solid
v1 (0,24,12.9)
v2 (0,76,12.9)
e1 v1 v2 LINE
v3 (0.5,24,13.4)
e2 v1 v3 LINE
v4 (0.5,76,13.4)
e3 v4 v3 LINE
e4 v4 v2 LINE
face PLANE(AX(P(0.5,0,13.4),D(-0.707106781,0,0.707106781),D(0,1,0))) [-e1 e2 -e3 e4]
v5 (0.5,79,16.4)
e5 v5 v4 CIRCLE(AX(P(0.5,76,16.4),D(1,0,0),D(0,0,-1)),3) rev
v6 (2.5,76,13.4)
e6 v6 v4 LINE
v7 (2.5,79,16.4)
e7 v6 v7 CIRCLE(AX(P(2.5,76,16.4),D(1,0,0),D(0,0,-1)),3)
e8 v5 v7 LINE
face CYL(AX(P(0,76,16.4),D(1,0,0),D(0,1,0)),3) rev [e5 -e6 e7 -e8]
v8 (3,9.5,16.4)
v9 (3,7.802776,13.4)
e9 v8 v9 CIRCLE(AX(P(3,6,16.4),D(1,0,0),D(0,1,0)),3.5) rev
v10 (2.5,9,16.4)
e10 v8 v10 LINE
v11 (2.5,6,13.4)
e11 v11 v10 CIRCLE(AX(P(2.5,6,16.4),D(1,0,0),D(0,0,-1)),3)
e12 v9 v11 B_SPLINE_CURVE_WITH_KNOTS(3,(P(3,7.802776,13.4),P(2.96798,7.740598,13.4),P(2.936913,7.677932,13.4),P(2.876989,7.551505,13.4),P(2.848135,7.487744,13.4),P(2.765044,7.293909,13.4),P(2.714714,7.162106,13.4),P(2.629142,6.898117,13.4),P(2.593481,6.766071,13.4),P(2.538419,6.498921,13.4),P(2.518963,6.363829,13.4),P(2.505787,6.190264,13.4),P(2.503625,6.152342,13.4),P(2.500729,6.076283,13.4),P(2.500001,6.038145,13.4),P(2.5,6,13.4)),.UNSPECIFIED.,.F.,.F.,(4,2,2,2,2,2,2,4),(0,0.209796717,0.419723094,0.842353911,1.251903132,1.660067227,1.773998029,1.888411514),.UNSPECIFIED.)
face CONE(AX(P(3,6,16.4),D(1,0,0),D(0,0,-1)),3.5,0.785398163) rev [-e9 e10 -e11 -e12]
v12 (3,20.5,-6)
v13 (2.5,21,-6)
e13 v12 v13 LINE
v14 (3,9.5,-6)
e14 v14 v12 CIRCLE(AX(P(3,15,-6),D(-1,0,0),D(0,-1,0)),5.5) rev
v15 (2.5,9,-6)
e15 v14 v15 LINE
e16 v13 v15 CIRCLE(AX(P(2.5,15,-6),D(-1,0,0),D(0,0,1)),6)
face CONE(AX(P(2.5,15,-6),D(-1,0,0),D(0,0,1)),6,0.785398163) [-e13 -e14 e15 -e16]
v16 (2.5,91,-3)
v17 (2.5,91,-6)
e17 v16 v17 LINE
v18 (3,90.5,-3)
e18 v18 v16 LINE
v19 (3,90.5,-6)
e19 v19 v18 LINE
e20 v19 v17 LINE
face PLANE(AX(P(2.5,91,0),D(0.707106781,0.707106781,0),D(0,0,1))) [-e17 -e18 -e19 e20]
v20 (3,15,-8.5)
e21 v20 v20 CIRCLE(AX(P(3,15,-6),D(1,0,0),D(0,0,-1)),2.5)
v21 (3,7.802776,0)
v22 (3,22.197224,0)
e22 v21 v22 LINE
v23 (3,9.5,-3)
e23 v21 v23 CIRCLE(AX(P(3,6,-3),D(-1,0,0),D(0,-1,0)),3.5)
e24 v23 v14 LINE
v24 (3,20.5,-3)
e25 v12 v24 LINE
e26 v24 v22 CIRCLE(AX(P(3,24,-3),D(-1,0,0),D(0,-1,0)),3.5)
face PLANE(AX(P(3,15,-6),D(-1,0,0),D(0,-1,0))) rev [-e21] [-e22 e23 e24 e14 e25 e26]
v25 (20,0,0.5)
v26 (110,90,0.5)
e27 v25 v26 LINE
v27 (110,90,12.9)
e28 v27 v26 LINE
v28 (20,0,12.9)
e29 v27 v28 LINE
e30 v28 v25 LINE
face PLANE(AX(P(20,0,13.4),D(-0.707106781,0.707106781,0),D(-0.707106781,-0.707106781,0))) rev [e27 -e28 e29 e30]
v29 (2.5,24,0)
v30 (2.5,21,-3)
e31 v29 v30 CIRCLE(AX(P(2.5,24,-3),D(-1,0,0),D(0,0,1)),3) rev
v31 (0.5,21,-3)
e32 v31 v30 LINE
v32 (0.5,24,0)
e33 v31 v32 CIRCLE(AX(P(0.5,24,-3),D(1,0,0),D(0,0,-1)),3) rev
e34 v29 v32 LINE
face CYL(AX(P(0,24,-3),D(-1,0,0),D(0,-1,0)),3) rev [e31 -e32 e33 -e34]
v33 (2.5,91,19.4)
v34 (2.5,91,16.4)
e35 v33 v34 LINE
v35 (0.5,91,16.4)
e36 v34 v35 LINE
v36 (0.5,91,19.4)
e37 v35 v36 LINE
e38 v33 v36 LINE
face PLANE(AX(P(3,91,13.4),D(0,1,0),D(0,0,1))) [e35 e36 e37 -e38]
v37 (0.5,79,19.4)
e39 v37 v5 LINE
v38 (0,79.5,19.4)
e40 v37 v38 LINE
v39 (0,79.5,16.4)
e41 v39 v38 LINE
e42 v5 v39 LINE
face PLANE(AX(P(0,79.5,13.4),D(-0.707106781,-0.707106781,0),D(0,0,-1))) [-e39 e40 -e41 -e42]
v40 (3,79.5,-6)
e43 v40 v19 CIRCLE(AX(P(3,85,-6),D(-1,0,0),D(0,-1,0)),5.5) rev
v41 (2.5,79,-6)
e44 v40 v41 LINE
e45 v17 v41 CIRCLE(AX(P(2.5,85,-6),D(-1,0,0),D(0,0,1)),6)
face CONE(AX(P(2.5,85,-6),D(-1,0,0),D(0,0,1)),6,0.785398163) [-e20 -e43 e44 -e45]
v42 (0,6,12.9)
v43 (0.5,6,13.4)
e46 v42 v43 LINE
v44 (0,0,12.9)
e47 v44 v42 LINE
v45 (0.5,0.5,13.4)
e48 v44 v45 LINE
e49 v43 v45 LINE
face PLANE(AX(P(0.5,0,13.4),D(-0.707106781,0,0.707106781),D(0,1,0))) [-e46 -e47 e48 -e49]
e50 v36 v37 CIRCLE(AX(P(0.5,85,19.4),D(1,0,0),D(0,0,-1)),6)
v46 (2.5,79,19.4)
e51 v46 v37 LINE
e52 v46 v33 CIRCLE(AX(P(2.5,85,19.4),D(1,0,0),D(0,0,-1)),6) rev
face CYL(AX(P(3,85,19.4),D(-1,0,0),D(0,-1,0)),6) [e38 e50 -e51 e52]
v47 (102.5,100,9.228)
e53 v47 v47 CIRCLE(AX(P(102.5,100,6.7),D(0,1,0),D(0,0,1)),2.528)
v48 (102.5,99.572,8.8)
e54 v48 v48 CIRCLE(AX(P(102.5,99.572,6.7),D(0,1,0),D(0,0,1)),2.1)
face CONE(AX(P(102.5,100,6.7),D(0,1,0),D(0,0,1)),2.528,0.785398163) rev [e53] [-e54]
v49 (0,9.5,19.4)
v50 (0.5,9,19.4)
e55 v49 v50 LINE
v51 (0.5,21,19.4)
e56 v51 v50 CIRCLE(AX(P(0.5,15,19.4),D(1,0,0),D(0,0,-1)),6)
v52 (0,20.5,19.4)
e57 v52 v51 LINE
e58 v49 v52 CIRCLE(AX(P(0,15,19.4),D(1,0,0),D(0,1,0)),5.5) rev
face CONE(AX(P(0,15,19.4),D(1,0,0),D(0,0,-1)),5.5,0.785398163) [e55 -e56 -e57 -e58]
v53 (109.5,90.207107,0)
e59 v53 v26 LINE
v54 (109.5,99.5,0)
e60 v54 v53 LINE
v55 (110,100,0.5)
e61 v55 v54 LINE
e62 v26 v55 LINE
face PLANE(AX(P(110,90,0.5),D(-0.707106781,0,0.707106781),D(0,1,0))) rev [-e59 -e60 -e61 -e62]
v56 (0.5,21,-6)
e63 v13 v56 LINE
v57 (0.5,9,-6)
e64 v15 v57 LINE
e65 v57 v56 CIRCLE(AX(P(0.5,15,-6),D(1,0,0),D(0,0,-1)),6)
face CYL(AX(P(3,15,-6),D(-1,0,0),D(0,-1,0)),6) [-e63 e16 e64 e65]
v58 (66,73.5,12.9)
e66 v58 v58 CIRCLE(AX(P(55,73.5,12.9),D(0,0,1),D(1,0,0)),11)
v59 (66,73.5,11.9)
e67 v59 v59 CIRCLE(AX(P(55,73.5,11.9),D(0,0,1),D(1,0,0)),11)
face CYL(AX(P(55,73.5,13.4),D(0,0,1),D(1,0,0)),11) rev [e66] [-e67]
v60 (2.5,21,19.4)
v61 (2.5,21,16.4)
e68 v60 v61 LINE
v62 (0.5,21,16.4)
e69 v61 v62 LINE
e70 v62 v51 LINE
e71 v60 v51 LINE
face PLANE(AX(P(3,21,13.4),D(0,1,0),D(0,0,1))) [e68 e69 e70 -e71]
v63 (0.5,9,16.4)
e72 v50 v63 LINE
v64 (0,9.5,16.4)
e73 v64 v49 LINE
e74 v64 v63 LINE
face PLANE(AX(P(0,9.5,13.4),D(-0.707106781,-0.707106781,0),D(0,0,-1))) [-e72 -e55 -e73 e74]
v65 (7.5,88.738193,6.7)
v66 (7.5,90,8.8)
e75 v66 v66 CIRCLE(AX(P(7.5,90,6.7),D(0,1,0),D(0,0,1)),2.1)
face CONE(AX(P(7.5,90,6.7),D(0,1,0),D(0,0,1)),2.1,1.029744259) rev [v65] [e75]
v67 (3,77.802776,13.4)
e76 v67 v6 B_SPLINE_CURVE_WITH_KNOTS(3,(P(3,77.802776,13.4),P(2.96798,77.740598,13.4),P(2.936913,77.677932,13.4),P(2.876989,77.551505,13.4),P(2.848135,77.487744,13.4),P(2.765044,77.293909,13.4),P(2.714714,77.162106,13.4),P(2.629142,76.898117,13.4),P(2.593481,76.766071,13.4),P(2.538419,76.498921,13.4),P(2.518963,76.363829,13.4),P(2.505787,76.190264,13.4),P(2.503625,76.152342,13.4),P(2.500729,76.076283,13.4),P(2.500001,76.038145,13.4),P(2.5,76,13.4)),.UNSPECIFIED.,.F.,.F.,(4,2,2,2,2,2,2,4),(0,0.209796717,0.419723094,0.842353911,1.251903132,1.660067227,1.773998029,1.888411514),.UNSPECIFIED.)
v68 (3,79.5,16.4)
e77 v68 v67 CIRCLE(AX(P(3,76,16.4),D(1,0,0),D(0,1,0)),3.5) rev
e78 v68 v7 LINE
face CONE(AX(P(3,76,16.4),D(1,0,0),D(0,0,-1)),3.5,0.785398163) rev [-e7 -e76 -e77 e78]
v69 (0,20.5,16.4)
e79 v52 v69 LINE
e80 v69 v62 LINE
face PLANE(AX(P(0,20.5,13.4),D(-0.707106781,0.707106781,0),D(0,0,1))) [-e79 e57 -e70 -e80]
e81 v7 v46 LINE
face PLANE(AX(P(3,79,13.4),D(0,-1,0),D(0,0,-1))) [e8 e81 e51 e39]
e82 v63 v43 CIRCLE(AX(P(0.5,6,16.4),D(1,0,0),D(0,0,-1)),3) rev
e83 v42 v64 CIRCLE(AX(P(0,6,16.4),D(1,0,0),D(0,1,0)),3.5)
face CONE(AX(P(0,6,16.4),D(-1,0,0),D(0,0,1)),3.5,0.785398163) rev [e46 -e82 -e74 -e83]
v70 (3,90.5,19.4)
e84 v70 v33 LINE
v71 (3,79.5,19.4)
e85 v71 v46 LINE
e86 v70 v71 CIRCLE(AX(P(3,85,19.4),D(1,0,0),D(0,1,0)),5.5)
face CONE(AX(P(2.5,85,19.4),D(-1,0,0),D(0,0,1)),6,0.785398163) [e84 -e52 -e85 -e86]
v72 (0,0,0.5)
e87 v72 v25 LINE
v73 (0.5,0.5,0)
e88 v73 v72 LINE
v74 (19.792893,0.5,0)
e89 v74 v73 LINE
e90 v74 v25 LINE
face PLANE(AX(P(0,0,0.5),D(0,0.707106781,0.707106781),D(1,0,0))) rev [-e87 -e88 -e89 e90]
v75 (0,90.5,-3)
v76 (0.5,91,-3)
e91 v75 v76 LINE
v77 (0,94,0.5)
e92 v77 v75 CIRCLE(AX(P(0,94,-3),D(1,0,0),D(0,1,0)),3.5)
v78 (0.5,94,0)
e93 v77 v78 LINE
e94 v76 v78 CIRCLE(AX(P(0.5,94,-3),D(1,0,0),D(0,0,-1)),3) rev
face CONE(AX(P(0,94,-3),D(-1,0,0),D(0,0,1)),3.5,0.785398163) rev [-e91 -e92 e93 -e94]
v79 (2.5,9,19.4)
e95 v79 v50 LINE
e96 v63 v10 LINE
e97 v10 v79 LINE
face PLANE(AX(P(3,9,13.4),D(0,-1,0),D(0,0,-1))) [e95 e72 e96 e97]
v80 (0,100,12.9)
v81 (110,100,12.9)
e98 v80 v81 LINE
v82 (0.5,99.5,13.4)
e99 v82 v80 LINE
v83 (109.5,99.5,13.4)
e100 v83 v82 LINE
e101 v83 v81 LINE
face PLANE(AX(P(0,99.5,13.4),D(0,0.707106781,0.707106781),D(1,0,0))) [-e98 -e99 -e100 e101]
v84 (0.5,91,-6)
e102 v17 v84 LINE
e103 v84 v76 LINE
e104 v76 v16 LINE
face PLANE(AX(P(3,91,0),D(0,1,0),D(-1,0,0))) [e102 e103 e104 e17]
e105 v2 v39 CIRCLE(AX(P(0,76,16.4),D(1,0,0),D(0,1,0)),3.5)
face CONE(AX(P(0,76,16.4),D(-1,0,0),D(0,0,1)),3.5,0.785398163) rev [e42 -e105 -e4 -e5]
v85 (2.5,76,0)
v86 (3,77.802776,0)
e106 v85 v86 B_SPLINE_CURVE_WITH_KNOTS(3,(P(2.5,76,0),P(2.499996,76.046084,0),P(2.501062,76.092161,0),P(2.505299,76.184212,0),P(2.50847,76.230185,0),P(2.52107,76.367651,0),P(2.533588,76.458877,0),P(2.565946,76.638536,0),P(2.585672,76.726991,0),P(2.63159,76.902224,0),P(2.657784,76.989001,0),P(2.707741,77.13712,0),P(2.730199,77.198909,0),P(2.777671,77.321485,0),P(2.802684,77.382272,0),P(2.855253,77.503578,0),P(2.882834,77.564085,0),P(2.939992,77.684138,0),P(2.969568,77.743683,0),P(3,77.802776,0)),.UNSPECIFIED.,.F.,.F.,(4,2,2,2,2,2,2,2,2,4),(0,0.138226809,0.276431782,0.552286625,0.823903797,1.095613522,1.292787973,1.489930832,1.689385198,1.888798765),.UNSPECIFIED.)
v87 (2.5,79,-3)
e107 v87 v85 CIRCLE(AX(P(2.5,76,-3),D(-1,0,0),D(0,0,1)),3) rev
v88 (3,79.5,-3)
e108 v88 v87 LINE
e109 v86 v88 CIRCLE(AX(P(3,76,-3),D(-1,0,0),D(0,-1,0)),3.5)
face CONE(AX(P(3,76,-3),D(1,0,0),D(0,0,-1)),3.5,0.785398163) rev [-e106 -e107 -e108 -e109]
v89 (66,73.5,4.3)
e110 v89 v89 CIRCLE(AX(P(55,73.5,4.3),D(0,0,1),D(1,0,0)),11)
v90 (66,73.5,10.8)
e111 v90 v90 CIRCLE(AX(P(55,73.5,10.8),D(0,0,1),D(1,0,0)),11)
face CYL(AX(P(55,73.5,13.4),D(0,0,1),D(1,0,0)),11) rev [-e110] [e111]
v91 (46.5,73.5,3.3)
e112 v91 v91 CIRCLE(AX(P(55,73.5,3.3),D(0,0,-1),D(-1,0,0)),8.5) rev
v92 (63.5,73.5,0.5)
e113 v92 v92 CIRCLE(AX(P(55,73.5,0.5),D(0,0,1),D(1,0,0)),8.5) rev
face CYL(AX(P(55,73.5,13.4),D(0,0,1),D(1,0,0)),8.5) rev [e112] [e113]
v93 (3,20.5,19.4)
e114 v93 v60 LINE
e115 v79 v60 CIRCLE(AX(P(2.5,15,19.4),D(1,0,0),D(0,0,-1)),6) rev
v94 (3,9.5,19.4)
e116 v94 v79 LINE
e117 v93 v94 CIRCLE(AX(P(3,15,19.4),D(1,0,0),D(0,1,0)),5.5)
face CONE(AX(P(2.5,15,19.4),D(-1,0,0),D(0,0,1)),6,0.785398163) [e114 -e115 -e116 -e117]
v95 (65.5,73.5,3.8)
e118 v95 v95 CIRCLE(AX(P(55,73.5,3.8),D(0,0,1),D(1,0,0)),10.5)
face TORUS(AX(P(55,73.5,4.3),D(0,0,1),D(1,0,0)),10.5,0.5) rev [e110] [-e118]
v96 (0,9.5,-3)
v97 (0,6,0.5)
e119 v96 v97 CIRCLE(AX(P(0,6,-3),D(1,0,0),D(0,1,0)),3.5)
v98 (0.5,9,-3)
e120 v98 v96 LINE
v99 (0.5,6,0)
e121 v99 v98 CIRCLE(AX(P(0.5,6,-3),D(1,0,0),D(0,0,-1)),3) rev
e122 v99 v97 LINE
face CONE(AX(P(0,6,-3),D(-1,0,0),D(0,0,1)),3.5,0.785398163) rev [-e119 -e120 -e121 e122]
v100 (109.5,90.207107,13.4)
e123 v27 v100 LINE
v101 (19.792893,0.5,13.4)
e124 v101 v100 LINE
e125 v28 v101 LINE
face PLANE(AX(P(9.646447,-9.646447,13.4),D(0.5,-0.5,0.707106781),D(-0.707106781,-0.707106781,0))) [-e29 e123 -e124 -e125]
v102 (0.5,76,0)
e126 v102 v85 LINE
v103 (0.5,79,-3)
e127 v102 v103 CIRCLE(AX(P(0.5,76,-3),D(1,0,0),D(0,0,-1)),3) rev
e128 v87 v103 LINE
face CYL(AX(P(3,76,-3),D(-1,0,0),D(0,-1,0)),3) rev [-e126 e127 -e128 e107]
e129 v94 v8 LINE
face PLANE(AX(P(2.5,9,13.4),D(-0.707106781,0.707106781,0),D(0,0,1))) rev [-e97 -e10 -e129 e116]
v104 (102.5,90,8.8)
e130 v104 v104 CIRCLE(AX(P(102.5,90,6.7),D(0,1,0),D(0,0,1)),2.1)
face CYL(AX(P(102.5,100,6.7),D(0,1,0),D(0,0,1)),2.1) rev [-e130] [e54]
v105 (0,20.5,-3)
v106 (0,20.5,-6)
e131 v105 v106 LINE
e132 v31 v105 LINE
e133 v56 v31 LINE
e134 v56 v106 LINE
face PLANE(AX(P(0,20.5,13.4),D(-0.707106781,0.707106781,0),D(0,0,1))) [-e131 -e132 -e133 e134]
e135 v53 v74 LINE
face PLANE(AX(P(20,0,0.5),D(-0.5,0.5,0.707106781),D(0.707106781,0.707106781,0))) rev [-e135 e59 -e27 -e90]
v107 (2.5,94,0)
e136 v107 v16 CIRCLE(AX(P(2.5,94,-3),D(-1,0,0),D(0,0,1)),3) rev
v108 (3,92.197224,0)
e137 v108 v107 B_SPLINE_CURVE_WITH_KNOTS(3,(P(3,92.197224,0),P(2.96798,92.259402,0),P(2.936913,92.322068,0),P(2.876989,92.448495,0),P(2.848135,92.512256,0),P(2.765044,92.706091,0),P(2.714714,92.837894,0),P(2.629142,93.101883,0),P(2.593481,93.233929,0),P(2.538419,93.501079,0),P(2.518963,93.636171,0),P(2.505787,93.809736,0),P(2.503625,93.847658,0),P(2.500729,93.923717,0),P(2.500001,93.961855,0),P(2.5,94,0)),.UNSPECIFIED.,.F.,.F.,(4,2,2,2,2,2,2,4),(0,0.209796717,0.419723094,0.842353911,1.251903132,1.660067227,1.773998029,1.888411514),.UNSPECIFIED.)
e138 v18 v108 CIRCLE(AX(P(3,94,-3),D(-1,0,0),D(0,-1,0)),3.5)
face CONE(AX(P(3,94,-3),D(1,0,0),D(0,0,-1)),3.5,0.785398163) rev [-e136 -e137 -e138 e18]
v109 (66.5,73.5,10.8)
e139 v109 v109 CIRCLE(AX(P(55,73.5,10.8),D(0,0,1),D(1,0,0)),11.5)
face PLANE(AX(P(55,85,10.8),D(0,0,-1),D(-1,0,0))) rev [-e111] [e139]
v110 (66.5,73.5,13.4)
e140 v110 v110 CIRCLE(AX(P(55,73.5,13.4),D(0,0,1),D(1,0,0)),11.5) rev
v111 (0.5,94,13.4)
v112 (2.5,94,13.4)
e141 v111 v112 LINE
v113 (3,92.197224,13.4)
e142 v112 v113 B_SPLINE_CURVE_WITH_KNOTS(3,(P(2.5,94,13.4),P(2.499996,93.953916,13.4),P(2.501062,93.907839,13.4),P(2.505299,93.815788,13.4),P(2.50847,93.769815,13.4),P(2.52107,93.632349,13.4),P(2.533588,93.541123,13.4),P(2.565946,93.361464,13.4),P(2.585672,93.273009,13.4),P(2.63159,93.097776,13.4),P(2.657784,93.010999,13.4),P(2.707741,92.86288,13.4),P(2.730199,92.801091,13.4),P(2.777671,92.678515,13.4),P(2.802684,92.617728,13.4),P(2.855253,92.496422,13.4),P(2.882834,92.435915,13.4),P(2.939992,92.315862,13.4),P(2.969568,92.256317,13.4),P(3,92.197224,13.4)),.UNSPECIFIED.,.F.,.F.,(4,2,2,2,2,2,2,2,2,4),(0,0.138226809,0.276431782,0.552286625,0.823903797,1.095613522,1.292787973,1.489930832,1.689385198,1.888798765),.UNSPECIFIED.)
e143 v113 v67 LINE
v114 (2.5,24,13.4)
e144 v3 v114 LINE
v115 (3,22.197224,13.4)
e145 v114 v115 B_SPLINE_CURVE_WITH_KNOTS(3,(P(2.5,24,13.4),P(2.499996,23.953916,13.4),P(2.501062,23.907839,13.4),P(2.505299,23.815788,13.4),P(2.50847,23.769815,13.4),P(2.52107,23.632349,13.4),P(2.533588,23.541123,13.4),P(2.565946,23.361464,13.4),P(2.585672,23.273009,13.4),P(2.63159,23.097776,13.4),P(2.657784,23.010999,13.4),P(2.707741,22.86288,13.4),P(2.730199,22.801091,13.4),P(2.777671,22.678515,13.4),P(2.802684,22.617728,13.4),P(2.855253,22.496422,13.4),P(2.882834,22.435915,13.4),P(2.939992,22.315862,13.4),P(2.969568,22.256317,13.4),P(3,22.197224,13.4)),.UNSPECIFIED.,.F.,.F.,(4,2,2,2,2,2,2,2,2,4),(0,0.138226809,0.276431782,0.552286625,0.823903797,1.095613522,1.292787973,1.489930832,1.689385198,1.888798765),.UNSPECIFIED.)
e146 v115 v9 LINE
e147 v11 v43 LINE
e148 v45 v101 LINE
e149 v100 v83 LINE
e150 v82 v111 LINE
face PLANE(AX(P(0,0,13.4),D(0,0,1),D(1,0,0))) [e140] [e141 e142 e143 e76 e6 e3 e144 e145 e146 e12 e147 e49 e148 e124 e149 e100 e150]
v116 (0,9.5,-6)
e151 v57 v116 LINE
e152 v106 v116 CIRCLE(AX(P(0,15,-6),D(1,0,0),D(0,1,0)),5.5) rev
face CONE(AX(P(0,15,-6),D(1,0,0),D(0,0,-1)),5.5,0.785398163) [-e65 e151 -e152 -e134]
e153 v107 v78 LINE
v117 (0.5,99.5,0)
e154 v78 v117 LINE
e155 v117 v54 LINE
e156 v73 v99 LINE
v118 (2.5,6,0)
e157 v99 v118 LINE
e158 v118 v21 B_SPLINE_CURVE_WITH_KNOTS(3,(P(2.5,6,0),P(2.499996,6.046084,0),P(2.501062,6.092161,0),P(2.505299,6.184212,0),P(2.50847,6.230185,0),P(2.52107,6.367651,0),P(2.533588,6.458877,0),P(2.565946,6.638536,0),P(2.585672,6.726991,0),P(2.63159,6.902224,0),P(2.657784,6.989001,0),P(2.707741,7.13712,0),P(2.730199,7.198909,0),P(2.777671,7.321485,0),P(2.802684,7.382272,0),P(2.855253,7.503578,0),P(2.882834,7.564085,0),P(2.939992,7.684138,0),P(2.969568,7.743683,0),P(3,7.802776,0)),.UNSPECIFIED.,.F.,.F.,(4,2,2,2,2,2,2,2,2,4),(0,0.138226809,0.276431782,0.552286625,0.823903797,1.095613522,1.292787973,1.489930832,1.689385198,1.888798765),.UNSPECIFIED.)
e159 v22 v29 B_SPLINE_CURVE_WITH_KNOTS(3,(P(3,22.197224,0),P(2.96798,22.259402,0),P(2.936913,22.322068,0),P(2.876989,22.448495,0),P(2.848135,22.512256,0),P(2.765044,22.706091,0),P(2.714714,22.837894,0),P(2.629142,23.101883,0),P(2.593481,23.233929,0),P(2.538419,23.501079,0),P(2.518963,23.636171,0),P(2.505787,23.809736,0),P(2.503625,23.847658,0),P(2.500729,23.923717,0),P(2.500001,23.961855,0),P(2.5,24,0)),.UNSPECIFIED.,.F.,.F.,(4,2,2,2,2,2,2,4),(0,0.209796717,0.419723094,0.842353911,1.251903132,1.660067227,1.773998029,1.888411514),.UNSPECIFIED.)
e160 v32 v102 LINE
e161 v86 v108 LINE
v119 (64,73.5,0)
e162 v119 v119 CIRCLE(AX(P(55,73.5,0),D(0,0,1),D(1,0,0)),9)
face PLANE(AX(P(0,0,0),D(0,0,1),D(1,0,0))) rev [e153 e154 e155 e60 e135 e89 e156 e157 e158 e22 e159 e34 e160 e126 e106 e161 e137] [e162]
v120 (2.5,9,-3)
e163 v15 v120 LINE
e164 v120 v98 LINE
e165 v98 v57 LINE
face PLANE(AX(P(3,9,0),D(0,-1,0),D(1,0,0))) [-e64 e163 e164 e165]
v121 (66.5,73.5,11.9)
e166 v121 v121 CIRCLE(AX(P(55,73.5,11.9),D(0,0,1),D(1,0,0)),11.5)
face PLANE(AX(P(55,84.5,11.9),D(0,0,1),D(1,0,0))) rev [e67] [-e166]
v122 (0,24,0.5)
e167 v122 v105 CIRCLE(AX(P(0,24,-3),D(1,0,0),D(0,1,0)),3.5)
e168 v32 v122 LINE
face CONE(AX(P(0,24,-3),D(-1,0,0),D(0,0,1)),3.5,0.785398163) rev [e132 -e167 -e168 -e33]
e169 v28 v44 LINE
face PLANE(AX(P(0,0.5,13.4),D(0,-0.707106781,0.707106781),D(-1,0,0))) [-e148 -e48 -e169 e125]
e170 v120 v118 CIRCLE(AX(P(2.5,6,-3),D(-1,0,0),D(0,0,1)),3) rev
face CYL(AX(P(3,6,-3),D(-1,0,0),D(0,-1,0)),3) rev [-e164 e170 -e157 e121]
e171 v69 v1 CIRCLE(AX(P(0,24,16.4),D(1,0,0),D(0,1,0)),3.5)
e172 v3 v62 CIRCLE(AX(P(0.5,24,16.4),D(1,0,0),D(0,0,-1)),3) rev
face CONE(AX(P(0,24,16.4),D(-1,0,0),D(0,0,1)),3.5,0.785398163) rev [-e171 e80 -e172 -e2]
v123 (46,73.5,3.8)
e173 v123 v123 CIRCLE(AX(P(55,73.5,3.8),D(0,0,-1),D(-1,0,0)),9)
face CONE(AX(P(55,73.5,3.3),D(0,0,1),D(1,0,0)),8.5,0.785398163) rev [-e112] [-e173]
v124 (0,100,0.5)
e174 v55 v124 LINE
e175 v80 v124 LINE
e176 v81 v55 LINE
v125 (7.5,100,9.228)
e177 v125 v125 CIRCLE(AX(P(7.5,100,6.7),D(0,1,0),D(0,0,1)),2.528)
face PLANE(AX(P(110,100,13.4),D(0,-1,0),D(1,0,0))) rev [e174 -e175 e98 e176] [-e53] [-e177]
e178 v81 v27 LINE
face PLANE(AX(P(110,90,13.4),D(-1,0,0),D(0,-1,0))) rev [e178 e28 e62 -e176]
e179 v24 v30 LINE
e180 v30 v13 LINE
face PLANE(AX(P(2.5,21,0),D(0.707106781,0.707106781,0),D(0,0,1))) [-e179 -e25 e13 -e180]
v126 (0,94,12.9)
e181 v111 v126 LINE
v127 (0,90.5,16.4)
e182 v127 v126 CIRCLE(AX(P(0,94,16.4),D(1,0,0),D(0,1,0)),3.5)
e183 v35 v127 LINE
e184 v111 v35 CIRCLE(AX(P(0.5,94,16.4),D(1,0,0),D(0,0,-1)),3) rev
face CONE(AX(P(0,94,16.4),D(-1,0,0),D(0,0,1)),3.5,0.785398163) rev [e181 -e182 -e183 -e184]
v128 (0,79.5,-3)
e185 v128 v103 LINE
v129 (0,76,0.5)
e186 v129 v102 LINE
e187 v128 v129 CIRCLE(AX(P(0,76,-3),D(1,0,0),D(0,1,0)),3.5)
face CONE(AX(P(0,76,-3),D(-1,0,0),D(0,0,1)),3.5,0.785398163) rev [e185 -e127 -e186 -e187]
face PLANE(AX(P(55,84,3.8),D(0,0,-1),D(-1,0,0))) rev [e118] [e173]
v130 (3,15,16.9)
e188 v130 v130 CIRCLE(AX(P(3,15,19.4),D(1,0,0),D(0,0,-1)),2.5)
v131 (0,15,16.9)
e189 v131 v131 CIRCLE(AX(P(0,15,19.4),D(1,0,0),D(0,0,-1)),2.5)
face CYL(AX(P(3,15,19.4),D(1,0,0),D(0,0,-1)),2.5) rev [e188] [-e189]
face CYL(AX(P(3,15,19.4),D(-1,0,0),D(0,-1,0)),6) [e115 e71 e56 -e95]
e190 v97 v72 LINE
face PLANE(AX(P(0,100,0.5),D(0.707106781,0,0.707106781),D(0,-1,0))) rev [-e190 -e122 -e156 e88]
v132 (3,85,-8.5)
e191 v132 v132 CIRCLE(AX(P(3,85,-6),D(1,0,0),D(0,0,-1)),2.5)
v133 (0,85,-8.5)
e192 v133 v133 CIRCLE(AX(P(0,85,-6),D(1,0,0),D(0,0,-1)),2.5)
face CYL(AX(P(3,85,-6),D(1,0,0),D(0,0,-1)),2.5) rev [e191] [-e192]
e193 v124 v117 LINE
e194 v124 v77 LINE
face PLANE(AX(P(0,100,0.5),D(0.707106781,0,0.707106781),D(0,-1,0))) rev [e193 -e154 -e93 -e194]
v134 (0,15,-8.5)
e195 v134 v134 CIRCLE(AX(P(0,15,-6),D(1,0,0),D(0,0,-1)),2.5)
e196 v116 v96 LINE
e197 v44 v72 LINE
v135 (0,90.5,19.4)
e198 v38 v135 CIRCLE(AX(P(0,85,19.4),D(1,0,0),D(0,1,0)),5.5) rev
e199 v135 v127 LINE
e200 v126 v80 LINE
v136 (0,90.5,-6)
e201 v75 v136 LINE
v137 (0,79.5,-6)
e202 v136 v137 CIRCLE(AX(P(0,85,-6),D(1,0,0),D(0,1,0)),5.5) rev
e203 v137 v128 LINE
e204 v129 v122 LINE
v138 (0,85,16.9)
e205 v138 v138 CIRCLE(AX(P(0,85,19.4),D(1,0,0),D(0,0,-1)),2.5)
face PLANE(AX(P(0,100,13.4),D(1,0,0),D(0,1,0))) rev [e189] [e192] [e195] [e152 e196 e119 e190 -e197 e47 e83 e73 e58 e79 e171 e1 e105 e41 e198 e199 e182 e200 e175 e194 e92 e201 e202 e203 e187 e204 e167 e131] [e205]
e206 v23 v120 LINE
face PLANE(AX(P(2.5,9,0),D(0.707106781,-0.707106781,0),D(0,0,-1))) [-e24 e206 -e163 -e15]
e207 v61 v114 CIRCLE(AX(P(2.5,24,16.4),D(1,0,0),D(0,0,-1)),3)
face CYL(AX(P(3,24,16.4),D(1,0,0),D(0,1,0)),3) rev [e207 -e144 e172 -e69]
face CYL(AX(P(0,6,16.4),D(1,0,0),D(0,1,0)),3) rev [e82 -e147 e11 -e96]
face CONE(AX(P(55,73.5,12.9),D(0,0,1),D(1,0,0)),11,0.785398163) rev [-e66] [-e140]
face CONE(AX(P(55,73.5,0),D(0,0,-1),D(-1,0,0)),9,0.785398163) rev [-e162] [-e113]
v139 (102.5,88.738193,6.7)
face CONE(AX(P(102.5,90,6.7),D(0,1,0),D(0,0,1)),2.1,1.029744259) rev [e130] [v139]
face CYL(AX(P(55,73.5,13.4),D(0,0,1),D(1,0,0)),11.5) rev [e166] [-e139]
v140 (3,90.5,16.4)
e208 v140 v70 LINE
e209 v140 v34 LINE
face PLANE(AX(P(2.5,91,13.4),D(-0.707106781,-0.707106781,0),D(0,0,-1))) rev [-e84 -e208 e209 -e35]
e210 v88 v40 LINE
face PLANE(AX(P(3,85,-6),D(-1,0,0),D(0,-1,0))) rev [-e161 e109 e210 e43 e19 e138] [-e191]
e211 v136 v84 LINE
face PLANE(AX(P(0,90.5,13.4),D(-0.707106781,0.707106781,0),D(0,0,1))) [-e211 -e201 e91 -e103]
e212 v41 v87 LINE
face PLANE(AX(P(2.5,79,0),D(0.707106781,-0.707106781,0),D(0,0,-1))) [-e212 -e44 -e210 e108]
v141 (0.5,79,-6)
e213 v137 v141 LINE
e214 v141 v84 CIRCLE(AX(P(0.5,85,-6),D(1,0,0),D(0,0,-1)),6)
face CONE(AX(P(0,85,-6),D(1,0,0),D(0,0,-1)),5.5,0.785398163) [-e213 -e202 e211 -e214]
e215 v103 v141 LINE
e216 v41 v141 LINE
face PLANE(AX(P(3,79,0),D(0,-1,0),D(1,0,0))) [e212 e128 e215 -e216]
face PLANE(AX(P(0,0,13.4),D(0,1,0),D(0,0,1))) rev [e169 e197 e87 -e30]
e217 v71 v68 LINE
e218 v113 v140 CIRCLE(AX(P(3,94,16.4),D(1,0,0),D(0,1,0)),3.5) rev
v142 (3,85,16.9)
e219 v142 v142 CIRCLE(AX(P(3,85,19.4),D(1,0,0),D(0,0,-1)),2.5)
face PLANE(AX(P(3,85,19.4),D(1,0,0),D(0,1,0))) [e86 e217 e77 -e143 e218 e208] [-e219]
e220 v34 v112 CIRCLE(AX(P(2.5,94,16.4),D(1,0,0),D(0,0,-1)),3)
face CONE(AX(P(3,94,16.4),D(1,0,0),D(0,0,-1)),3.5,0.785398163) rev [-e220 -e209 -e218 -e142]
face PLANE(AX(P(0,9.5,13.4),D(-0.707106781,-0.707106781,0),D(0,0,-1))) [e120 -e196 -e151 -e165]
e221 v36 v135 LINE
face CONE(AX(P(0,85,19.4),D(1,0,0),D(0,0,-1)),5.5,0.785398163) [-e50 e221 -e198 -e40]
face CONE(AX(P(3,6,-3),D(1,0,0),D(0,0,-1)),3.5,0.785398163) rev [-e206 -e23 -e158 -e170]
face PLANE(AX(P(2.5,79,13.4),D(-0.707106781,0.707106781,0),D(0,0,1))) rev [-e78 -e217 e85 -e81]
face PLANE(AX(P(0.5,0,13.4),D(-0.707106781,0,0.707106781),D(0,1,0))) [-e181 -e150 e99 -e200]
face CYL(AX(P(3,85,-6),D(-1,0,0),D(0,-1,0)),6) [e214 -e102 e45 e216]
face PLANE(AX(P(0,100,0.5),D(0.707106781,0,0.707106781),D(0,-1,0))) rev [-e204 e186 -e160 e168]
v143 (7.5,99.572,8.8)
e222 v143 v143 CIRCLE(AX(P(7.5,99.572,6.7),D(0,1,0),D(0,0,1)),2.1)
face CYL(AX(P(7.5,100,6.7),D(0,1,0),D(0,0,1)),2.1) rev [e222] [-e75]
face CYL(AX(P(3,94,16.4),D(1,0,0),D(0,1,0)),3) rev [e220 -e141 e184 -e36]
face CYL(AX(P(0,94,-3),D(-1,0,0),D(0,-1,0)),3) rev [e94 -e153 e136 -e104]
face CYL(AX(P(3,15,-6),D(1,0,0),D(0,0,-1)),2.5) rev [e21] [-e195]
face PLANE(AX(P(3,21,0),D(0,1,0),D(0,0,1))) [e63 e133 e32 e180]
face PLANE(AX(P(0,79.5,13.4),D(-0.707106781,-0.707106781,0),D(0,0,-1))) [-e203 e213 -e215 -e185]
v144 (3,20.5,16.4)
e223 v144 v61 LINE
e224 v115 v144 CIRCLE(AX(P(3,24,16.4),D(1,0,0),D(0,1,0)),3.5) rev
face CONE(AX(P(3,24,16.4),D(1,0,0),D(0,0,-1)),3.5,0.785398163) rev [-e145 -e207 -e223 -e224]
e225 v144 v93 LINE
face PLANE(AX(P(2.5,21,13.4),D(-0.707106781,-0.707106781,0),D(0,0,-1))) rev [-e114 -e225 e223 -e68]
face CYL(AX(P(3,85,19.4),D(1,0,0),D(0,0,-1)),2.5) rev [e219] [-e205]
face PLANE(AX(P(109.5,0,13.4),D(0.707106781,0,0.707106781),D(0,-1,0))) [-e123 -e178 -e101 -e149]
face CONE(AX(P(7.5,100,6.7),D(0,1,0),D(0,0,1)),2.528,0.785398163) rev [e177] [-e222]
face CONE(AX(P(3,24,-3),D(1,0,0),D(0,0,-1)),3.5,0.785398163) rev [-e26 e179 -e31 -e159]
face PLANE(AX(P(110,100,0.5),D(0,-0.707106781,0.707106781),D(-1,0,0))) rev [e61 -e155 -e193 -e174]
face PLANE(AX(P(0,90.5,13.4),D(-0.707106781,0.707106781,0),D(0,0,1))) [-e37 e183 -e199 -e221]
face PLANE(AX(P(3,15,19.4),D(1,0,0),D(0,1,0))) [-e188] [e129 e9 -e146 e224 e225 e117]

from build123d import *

# Parameters (mm, degrees)
BOSS_EXTRUDE1_DEPTH         = 13.4
BOSS_EXTRUDE2_DEPTH         = 3
FILLET1_R                   = 3
CHAMFER1_SIZE               = 0.5
F_5_0MM_DOWEL_HOLE1_D       = 5
FASE1_SIZE                  = 0.5
M5_TAPPED_HOLE1_D           = 4.2
M5_TAPPED_HOLE1_DEPTH       = 10
M5_TAPPED_HOLE1_CSINK_D     = 5.056
M5_TAPPED_HOLE1_CSINK_ANGLE = 90
M5_TAPPED_HOLE1_TIP         = 1.2618073


with BuildPart() as part:
    # Sketch1 → Boss-Extrude1 (new body)
    with BuildSketch(Plane.XY):
        Polygon((0, 0), (20, 0), (110, 90), (110, 100), (0, 100), align=None)
    extrude(amount=BOSS_EXTRUDE1_DEPTH)

    # Sketch3 → Boss-Extrude2 (add)
    with BuildSketch(Plane.ZY):
        with BuildLine():
            Line((13.4, 91), (19.4, 91))
            ThreePointArc((19.4, 91), (25.4, 85), (19.4, 79))
            Line((19.4, 79), (13.4, 79))
            Line((13.4, 79), (13.4, 91))
        make_face()
        with BuildLine():
            Line((13.4, 21), (19.4, 21))
            ThreePointArc((19.4, 21), (25.4, 15), (19.4, 9))
            Line((19.4, 9), (13.4, 9))
            Line((13.4, 9), (13.4, 21))
        make_face()
        with BuildLine():
            Line((0, 91), (-6, 91))
            ThreePointArc((-6, 91), (-12, 85), (-6, 79))
            Line((-6, 79), (0, 79))
            Line((0, 79), (0, 91))
        make_face()
        with BuildLine():
            Line((0, 21), (-6, 21))
            ThreePointArc((-6, 21), (-12, 15), (-6, 9))
            Line((-6, 9), (0, 9))
            Line((0, 9), (0, 21))
        make_face()
    extrude(amount=-BOSS_EXTRUDE2_DEPTH)

    # Fillet1
    fillet1_edges = [part.edges().sort_by_distance(p)[0] for p in [
        (1.5, 9, 13.4),
        (1.5, 21, 13.4),
        (1.5, 91, 0),
        (1.5, 79, 0),
        (1.5, 21, 0),
        (1.5, 9, 0),
        (1.5, 79, 13.4),
        (1.5, 91, 13.4),
    ]]
    fillet(fillet1_edges, radius=FILLET1_R)

    # Chamfer1
    # the kernel refuses this chamfer: 0.5 mm, written as the material it takes off along each edge
    with BuildSketch(Plane(origin=(19.09077276, -0.90922724, 13.4), x_dir=(0.01944252080601503, -0.019442520806014957, -0.9996219169112968), z_dir=(0.7071067811865462, 0.7071067811865489, 0))) as chamfer1_piece_1:
        Polygon((CHAMFER1_SIZE * 0.999621916911, CHAMFER1_SIZE * 0.0274958766106), (-CHAMFER1_SIZE * 0.0274958766106, CHAMFER1_SIZE * 0.999621916911), (0, 0), align=None)
    extrude(amount=129.850903602, mode=Mode.SUBTRACT)
    with BuildSketch(Plane(origin=(110, 88.714158506, 13.4), x_dir=(0.0274958766105822, 0, -0.999621916911297), z_dir=(0, 1, 0))) as chamfer1_piece_2:
        Polygon((CHAMFER1_SIZE * 0.999621916911, CHAMFER1_SIZE * 0.0274958766106), (-CHAMFER1_SIZE * 0.0274958766106, CHAMFER1_SIZE * 0.999621916911), (0, 0), align=None)
    extrude(amount=12.571682988, mode=Mode.SUBTRACT)
    with BuildSketch(Plane(origin=(111.285841494, 100, 13.4), x_dir=(0, 0.0274958766105822, -0.999621916911297), z_dir=(-1, 0, 0)), Plane(origin=(111.285841494, 100, 0), x_dir=(0, -0.9996219169112968, -0.027495876610586483), z_dir=(-1, 0, 0))) as chamfer1_piece_3:
        Polygon((CHAMFER1_SIZE * 0.999621916911, CHAMFER1_SIZE * 0.0274958766106), (-CHAMFER1_SIZE * 0.0274958766106, CHAMFER1_SIZE * 0.999621916911), (0, 0), align=None)
    extrude(amount=112.571682988, mode=Mode.SUBTRACT)
    with BuildSketch(Plane(origin=(3, 21, 16.4), x_dir=(0.02749587661058555, -0.9996219169112968, 1.1837901526131803e-15), z_dir=(0, 0, 1)), Plane(origin=(0, 79, -6), x_dir=(-0.027495876610586535, 0.9996219169112968, 0), z_dir=(0, 0, 1)), Plane(origin=(0, 9, -6), x_dir=(-0.027495876610586584, 0.9996219169112968, 0), z_dir=(0, 0, 1)), Plane(origin=(3, 91, 16.4), x_dir=(0.02749587661058574, -0.9996219169112968, 2.3675803052263605e-15), z_dir=(0, 0, 1)), Plane(origin=(3, 79, 19.4), x_dir=(0.027495876610586605, 0.9996219169112968, -2.3675803052263605e-15), z_dir=(0, 0, -1)), Plane(origin=(3, 9, 19.4), x_dir=(0.02749587661058651, 0.9996219169112968, -1.1837901526131803e-15), z_dir=(0, 0, -1)), Plane(origin=(0, 21, -3), x_dir=(-0.027495876610586823, -0.9996219169112968, 0), z_dir=(0, 0, -1)), Plane(origin=(0, 91, -3), x_dir=(-0.027495876610586435, -0.9996219169112968, 0), z_dir=(0, 0, -1))) as chamfer1_piece_4:
        Polygon((CHAMFER1_SIZE * 0.999621916911, -CHAMFER1_SIZE * 0.0274958766106), (-CHAMFER1_SIZE * 0.0274958766106, -CHAMFER1_SIZE * 0.999621916911), (0, 0), align=None)
    extrude(amount=3, mode=Mode.SUBTRACT)
    with BuildSketch(Plane(origin=(3, 15, 19.4), x_dir=(0, 1, 0), z_dir=(0, 0, -1))) as chamfer1_piece_5:
        Polygon((6 - CHAMFER1_SIZE, 0), (6, -CHAMFER1_SIZE), (6, 0), align=None)
    revolve(axis=Axis((3, 15, 19.4), (1, 0, 0)), revolution_arc=180, mode=Mode.SUBTRACT)
    with BuildSketch(Plane(origin=(0, 15, 19.4), x_dir=(0, 1, 0), z_dir=(0, 0, -1))) as chamfer1_piece_6:
        Polygon((6 - CHAMFER1_SIZE, 0), (6, CHAMFER1_SIZE), (6, 0), align=None)
    revolve(axis=Axis((0, 15, 19.4), (1, 0, 0)), revolution_arc=180, mode=Mode.SUBTRACT)
    with BuildSketch(Plane(origin=(0, 21, 16.4), x_dir=(-0.027495876610586823, -0.9996219169112968, 1.1837901526131803e-15), z_dir=(0, 0, 1)), Plane(origin=(3, 79, -6), x_dir=(0.027495876610586605, 0.9996219169112968, 0), z_dir=(0, 0, 1)), Plane(origin=(3, 9, -6), x_dir=(0.02749587661058651, 0.9996219169112968, 0), z_dir=(0, 0, 1)), Plane(origin=(0, 91, 16.4), x_dir=(-0.027495876610586435, -0.9996219169112968, 2.3675803052263605e-15), z_dir=(0, 0, 1)), Plane(origin=(0, 79, 19.4), x_dir=(-0.027495876610586535, 0.9996219169112968, -2.3675803052263605e-15), z_dir=(0, 0, -1)), Plane(origin=(0, 9, 19.4), x_dir=(-0.027495876610586584, 0.9996219169112968, -1.1837901526131803e-15), z_dir=(0, 0, -1)), Plane(origin=(3, 21, -3), x_dir=(0.02749587661058555, -0.9996219169112968, 0), z_dir=(0, 0, -1)), Plane(origin=(3, 91, -3), x_dir=(0.02749587661058574, -0.9996219169112968, 0), z_dir=(0, 0, -1))) as chamfer1_piece_7:
        Polygon((CHAMFER1_SIZE * 0.999621916911, CHAMFER1_SIZE * 0.0274958766106), (-CHAMFER1_SIZE * 0.0274958766106, CHAMFER1_SIZE * 0.999621916911), (0, 0), align=None)
    extrude(amount=3, mode=Mode.SUBTRACT)
    with BuildSketch(Plane(origin=(3, 85, -6), x_dir=(0, 1, 0), z_dir=(0, 0, 1))) as chamfer1_piece_8:
        Polygon((6 - CHAMFER1_SIZE, 0), (6, CHAMFER1_SIZE), (6, 0), align=None)
    revolve(axis=Axis((3, 85, -6), (-1, 0, 0)), revolution_arc=180, mode=Mode.SUBTRACT)
    with BuildSketch(Plane(origin=(0, 85, -6), x_dir=(0, 1, 0), z_dir=(0, 0, 1))) as chamfer1_piece_9:
        Polygon((6 - CHAMFER1_SIZE, 0), (6, -CHAMFER1_SIZE), (6, 0), align=None)
    revolve(axis=Axis((0, 85, -6), (-1, 0, 0)), revolution_arc=180, mode=Mode.SUBTRACT)
    with BuildSketch(Plane(origin=(3, 15, -6), x_dir=(0, 1, 0), z_dir=(0, 0, 1))) as chamfer1_piece_10:
        Polygon((6 - CHAMFER1_SIZE, 0), (6, CHAMFER1_SIZE), (6, 0), align=None)
    revolve(axis=Axis((3, 15, -6), (-1, 0, 0)), revolution_arc=180, mode=Mode.SUBTRACT)
    with BuildSketch(Plane(origin=(0, 15, -6), x_dir=(0, 1, 0), z_dir=(0, 0, 1))) as chamfer1_piece_11:
        Polygon((6 - CHAMFER1_SIZE, 0), (6, -CHAMFER1_SIZE), (6, 0), align=None)
    revolve(axis=Axis((0, 15, -6), (-1, 0, 0)), revolution_arc=180, mode=Mode.SUBTRACT)
    with BuildSketch(Plane(origin=(3, 85, 19.4), x_dir=(0, 1, 0), z_dir=(0, 0, -1))) as chamfer1_piece_12:
        Polygon((6 - CHAMFER1_SIZE, 0), (6, -CHAMFER1_SIZE), (6, 0), align=None)
    revolve(axis=Axis((3, 85, 19.4), (1, 0, 0)), revolution_arc=180, mode=Mode.SUBTRACT)
    with BuildSketch(Plane(origin=(0, 85, 19.4), x_dir=(0, 1, 0), z_dir=(0, 0, -1))) as chamfer1_piece_13:
        Polygon((6 - CHAMFER1_SIZE, 0), (6, CHAMFER1_SIZE), (6, 0), align=None)
    revolve(axis=Axis((0, 85, 19.4), (1, 0, 0)), revolution_arc=180, mode=Mode.SUBTRACT)
    with BuildSketch(Plane(origin=(0, 101.285841494, 13.4), x_dir=(-0.027495876610586337, 0, -0.9996219169112968), z_dir=(0, -1, 0)), Plane(origin=(0, 6, 13.4), x_dir=(-0.0274958766105864, 0, -0.9996219169112968), z_dir=(0, -1, 0))) as chamfer1_piece_14:
        Polygon((CHAMFER1_SIZE * 0.999621916911, CHAMFER1_SIZE * 0.0274958766106), (-CHAMFER1_SIZE * 0.0274958766106, CHAMFER1_SIZE * 0.999621916911), (0, 0), align=None)
    extrude(amount=7.285841494, mode=Mode.SUBTRACT)
    with BuildSketch(Plane(origin=(110, 88.714158506, 0), x_dir=(0.02749587661058218, 0, 0.9996219169112968), z_dir=(0, 1, 0))) as chamfer1_piece_15:
        Polygon((CHAMFER1_SIZE * 0.999621916911, -CHAMFER1_SIZE * 0.0274958766106), (-CHAMFER1_SIZE * 0.0274958766106, -CHAMFER1_SIZE * 0.999621916911), (0, 0), align=None)
    extrude(amount=12.571682988, mode=Mode.SUBTRACT)
    with BuildSketch(Plane(origin=(19.09077276, -0.90922724, 0), x_dir=(0.01944252080601502, -0.019442520806014944, 0.9996219169112968), z_dir=(0.7071067811865462, 0.7071067811865489, 0))) as chamfer1_piece_16:
        Polygon((CHAMFER1_SIZE * 0.999621916911, -CHAMFER1_SIZE * 0.0274958766106), (-CHAMFER1_SIZE * 0.0274958766106, -CHAMFER1_SIZE * 0.999621916911), (0, 0), align=None)
    extrude(amount=129.850903602, mode=Mode.SUBTRACT)
    with BuildSketch(Plane(origin=(0, 76, 13.4), x_dir=(-0.027495876610586296, 0, -0.9996219169112968), z_dir=(0, -1, 0))) as chamfer1_piece_17:
        Polygon((CHAMFER1_SIZE * 0.999621916911, CHAMFER1_SIZE * 0.0274958766106), (-CHAMFER1_SIZE * 0.0274958766106, CHAMFER1_SIZE * 0.999621916911), (0, 0), align=None)
    extrude(amount=52, mode=Mode.SUBTRACT)
    with BuildSketch(Plane(origin=(-1.285841494, 0, 0), x_dir=(0, -0.027495876610586372, 0.9996219169112968), z_dir=(1, 0, 0))) as chamfer1_piece_18:
        Polygon((CHAMFER1_SIZE * 0.999621916911, -CHAMFER1_SIZE * 0.0274958766106), (-CHAMFER1_SIZE * 0.0274958766106, -CHAMFER1_SIZE * 0.999621916911), (0, 0), align=None)
    extrude(amount=22.571682988, mode=Mode.SUBTRACT)
    with BuildSketch(Plane(origin=(0, 101.285841494, 0), x_dir=(-0.027495876610586313, 0, 0.9996219169112968), z_dir=(0, -1, 0)), Plane(origin=(0, 6, 0), x_dir=(-0.027495876610586382, 0, 0.9996219169112968), z_dir=(0, -1, 0))) as chamfer1_piece_19:
        Polygon((CHAMFER1_SIZE * 0.999621916911, -CHAMFER1_SIZE * 0.0274958766106), (-CHAMFER1_SIZE * 0.0274958766106, -CHAMFER1_SIZE * 0.999621916911), (0, 0), align=None)
    extrude(amount=7.285841494, mode=Mode.SUBTRACT)
    with BuildSketch(Plane(origin=(0, 76, 0), x_dir=(-0.027495876610586275, 0, 0.9996219169112968), z_dir=(0, -1, 0))) as chamfer1_piece_20:
        Polygon((CHAMFER1_SIZE * 0.999621916911, -CHAMFER1_SIZE * 0.0274958766106), (-CHAMFER1_SIZE * 0.0274958766106, -CHAMFER1_SIZE * 0.999621916911), (0, 0), align=None)
    extrude(amount=52, mode=Mode.SUBTRACT)
    with BuildSketch(Plane(origin=(0, 76, 16.4), x_dir=(0, 0, -1), z_dir=(0, -1, 0))) as chamfer1_piece_21:
        Polygon((3 + CHAMFER1_SIZE, 0), (3, CHAMFER1_SIZE), (3, 0), align=None)
    revolve(axis=Axis((0, 76, 16.4), (1, 0, 0)), revolution_arc=90, mode=Mode.SUBTRACT)
    with BuildSketch(Plane(origin=(3, 76, 16.4), x_dir=(0, -0.4157670192732941, -0.9094711571482629), z_dir=(0, -0.9094711571482629, 0.4157670192732941))) as chamfer1_piece_22_section:
        Polygon((3, -CHAMFER1_SIZE), (3 + CHAMFER1_SIZE, 0), (3, 0), align=None)
    chamfer1_piece_22 = revolve(axis=Axis((3, 76, 16.4), (1, 0, 0)), revolution_arc=114.56762863, mode=Mode.PRIVATE)
    chamfer1_piece_22 = split(chamfer1_piece_22, bisect_by=Plane(origin=(2.821133153, 78.122730565, 13.4), z_dir=(0, 0, 1)), keep=Keep.TOP, mode=Mode.PRIVATE)
    add(chamfer1_piece_22, mode=Mode.SUBTRACT)
    with BuildSketch(Plane(origin=(0, 94, 16.4), x_dir=(0, 0, -1), z_dir=(0, 1, 0))) as chamfer1_piece_23:
        Polygon((3 + CHAMFER1_SIZE, 0), (3, -CHAMFER1_SIZE), (3, 0), align=None)
    revolve(axis=Axis((0, 94, 16.4), (-1, 0, 0)), revolution_arc=90, mode=Mode.SUBTRACT)
    with BuildSketch(Plane(origin=(3, 94, 16.4), x_dir=(0, 0.4157670192732941, -0.9094711571482629), z_dir=(0, 0.9094711571482629, 0.4157670192732941))) as chamfer1_piece_24_section:
        Polygon((3 + CHAMFER1_SIZE, 0), (3, CHAMFER1_SIZE), (3, 0), align=None)
    chamfer1_piece_24 = revolve(axis=Axis((3, 94, 16.4), (-1, 0, 0)), revolution_arc=114.56762863, mode=Mode.PRIVATE)
    chamfer1_piece_24 = split(chamfer1_piece_24, bisect_by=Plane(origin=(2.821133146, 91.87726966, 13.4), z_dir=(0, 0, 1)), keep=Keep.TOP, mode=Mode.PRIVATE)
    add(chamfer1_piece_24, mode=Mode.SUBTRACT)
    with BuildSketch(Plane(origin=(0, 24, 16.4), x_dir=(0, 0, -1), z_dir=(0, 1, 0))) as chamfer1_piece_25:
        Polygon((3 + CHAMFER1_SIZE, 0), (3, -CHAMFER1_SIZE), (3, 0), align=None)
    revolve(axis=Axis((0, 24, 16.4), (-1, 0, 0)), revolution_arc=90, mode=Mode.SUBTRACT)
    with BuildSketch(Plane(origin=(-1.285841494, 0, 13.4), x_dir=(0, -0.02749587661058639, -0.9996219169112968), z_dir=(1, 0, 0))) as chamfer1_piece_26:
        Polygon((CHAMFER1_SIZE * 0.999621916911, CHAMFER1_SIZE * 0.0274958766106), (-CHAMFER1_SIZE * 0.0274958766106, CHAMFER1_SIZE * 0.999621916911), (0, 0), align=None)
    extrude(amount=22.571682988, mode=Mode.SUBTRACT)
    with BuildSketch(Plane(origin=(3, 24, 16.4), x_dir=(0, 0.4157670192732905, -0.9094711571482645), z_dir=(0, 0.9094711571482645, 0.4157670192732905))) as chamfer1_piece_27_section:
        Polygon((3 + CHAMFER1_SIZE, 0), (3, CHAMFER1_SIZE), (3, 0), align=None)
    chamfer1_piece_27 = revolve(axis=Axis((3, 24, 16.4), (-1, 0, 0)), revolution_arc=114.56762863, mode=Mode.PRIVATE)
    chamfer1_piece_27 = split(chamfer1_piece_27, bisect_by=Plane(origin=(2.821133146, 21.877269654, 13.4), z_dir=(0, 0, 1)), keep=Keep.TOP, mode=Mode.PRIVATE)
    add(chamfer1_piece_27, mode=Mode.SUBTRACT)
    with BuildSketch(Plane(origin=(0, 6, 16.4), x_dir=(0, 0, -1), z_dir=(0, -1, 0))) as chamfer1_piece_28:
        Polygon((3 + CHAMFER1_SIZE, 0), (3, CHAMFER1_SIZE), (3, 0), align=None)
    revolve(axis=Axis((0, 6, 16.4), (1, 0, 0)), revolution_arc=90, mode=Mode.SUBTRACT)
    with BuildSketch(Plane(origin=(3, 6, 16.4), x_dir=(0, -0.4157670192732901, -0.9094711571482649), z_dir=(0, -0.9094711571482649, 0.4157670192732901))) as chamfer1_piece_29_section:
        Polygon((3, -CHAMFER1_SIZE), (3 + CHAMFER1_SIZE, 0), (3, 0), align=None)
    chamfer1_piece_29 = revolve(axis=Axis((3, 6, 16.4), (1, 0, 0)), revolution_arc=114.56762863, mode=Mode.PRIVATE)
    chamfer1_piece_29 = split(chamfer1_piece_29, bisect_by=Plane(origin=(2.821133155, 8.122730647, 13.4), z_dir=(0, 0, 1)), keep=Keep.TOP, mode=Mode.PRIVATE)
    add(chamfer1_piece_29, mode=Mode.SUBTRACT)
    with BuildSketch(Plane(origin=(0, 24, -3), x_dir=(0, 0, 1), z_dir=(0, 1, 0))) as chamfer1_piece_30:
        Polygon((3 + CHAMFER1_SIZE, 0), (3, CHAMFER1_SIZE), (3, 0), align=None)
    revolve(axis=Axis((0, 24, -3), (1, 0, 0)), revolution_arc=90, mode=Mode.SUBTRACT)
    with BuildSketch(Plane(origin=(3, 24, -3), x_dir=(0, 0.4157670192732905, 0.9094711571482645), z_dir=(0, 0.9094711571482645, -0.4157670192732905))) as chamfer1_piece_31_section:
        Polygon((3 + CHAMFER1_SIZE, 0), (3, -CHAMFER1_SIZE), (3, 0), align=None)
    chamfer1_piece_31 = revolve(axis=Axis((3, 24, -3), (1, 0, 0)), revolution_arc=114.56762863, mode=Mode.PRIVATE)
    chamfer1_piece_31 = split(chamfer1_piece_31, bisect_by=Plane(origin=(2.821133159, 21.877269233, 0), z_dir=(0, 0, -1)), keep=Keep.TOP, mode=Mode.PRIVATE)
    add(chamfer1_piece_31, mode=Mode.SUBTRACT)
    with BuildSketch(Plane(origin=(0, 6, -3), x_dir=(0, 0, 1), z_dir=(0, -1, 0))) as chamfer1_piece_32:
        Polygon((3 + CHAMFER1_SIZE, 0), (3, -CHAMFER1_SIZE), (3, 0), align=None)
    revolve(axis=Axis((0, 6, -3), (-1, 0, 0)), revolution_arc=90, mode=Mode.SUBTRACT)
    with BuildSketch(Plane(origin=(3, 6, -3), x_dir=(0, -0.4157670192732901, 0.9094711571482649), z_dir=(0, -0.9094711571482649, -0.4157670192732901))) as chamfer1_piece_33_section:
        Polygon((3, CHAMFER1_SIZE), (3 + CHAMFER1_SIZE, 0), (3, 0), align=None)
    chamfer1_piece_33 = revolve(axis=Axis((3, 6, -3), (-1, 0, 0)), revolution_arc=114.56762863, mode=Mode.PRIVATE)
    chamfer1_piece_33 = split(chamfer1_piece_33, bisect_by=Plane(origin=(2.821133152, 8.122730538, 0), z_dir=(0, 0, -1)), keep=Keep.TOP, mode=Mode.PRIVATE)
    add(chamfer1_piece_33, mode=Mode.SUBTRACT)
    with BuildSketch(Plane(origin=(0, 94, -3), x_dir=(0, 0, 1), z_dir=(0, 1, 0))) as chamfer1_piece_34:
        Polygon((3 + CHAMFER1_SIZE, 0), (3, CHAMFER1_SIZE), (3, 0), align=None)
    revolve(axis=Axis((0, 94, -3), (1, 0, 0)), revolution_arc=90, mode=Mode.SUBTRACT)
    with BuildSketch(Plane(origin=(3, 94, -3), x_dir=(0, 0.4157670192732941, 0.9094711571482629), z_dir=(0, 0.9094711571482629, -0.4157670192732941))) as chamfer1_piece_35_section:
        Polygon((3 + CHAMFER1_SIZE, 0), (3, -CHAMFER1_SIZE), (3, 0), align=None)
    chamfer1_piece_35 = revolve(axis=Axis((3, 94, -3), (1, 0, 0)), revolution_arc=114.56762863, mode=Mode.PRIVATE)
    chamfer1_piece_35 = split(chamfer1_piece_35, bisect_by=Plane(origin=(2.821133153, 91.877269435, 0), z_dir=(0, 0, -1)), keep=Keep.TOP, mode=Mode.PRIVATE)
    add(chamfer1_piece_35, mode=Mode.SUBTRACT)
    with BuildSketch(Plane(origin=(0, 76, -3), x_dir=(0, 0, 1), z_dir=(0, -1, 0))) as chamfer1_piece_36:
        Polygon((3 + CHAMFER1_SIZE, 0), (3, -CHAMFER1_SIZE), (3, 0), align=None)
    revolve(axis=Axis((0, 76, -3), (-1, 0, 0)), revolution_arc=90, mode=Mode.SUBTRACT)
    with BuildSketch(Plane(origin=(3, 76, -3), x_dir=(0, -0.4157670192732941, 0.9094711571482629), z_dir=(0, -0.9094711571482629, -0.4157670192732941))) as chamfer1_piece_37_section:
        Polygon((3, CHAMFER1_SIZE), (3 + CHAMFER1_SIZE, 0), (3, 0), align=None)
    chamfer1_piece_37 = revolve(axis=Axis((3, 76, -3), (-1, 0, 0)), revolution_arc=114.56762863, mode=Mode.PRIVATE)
    chamfer1_piece_37 = split(chamfer1_piece_37, bisect_by=Plane(origin=(2.821133153, 78.122730565, 0), z_dir=(0, 0, -1)), keep=Keep.TOP, mode=Mode.PRIVATE)
    add(chamfer1_piece_37, mode=Mode.SUBTRACT)

    # Ø5.0mm Dowel Hole1 (through all)
    with Locations(Plane(origin=(3, 0, 0), x_dir=(0, 0, -1), z_dir=(1, 0, 0))):
        with Locations((-19.4, 85), (-19.4, 15), (6, 15), (6, 85)):
            Hole(F_5_0MM_DOWEL_HOLE1_D / 2)

    # Sketch7 → Cut-Revolve1 (revolve, cut)
    with BuildSketch(Plane(origin=(55, 0, 0), x_dir=(0, 0, -1), z_dir=(1, 0, 0)), mode=Mode.PRIVATE) as cut_revolve1_sk:
        with BuildLine():
            Line((-13.4, 84.5), (-11.9, 84.5))
            Line((-11.9, 84.5), (-11.9, 85))
            Line((-11.9, 85), (-10.8, 85))
            Line((-10.8, 85), (-10.8, 84.5))
            Line((-10.8, 84.5), (-4.3, 84.5))
            ThreePointArc((-4.3, 84.5), (-3.946446609, 84.353553391), (-3.8, 84))
            Line((-3.8, 84), (-3.8, 82))
            Line((-3.8, 82), (0, 82))
            Line((0, 82), (0, 73.5))
            Line((0, 73.5), (-13.4, 73.5))
            Line((-13.4, 73.5), (-13.4, 84.5))
        make_face()
    revolve(cut_revolve1_sk.sketch.rotate(Axis((55, 73.5, 13.4), (0, 0, -1)), 90), axis=Axis((55, 73.5, 13.4), (0, 0, -1)), mode=Mode.SUBTRACT)

    # Fase1
    fase1_edges = [part.edges().sort_by_distance(p)[0] for p in [
        (44, 73.5, 13.4),
        (46.5, 73.5, 3.8),
        (46.5, 73.5, 0),
    ]]
    chamfer(fase1_edges, length=FASE1_SIZE)

    # M5 Tapped Hole1
    with Locations(Plane(origin=(0, 100, 0), x_dir=(1, 0, 0), z_dir=(0, 1, 0))):
        with Locations((7.5, -6.7), (102.5, -6.7)):
            CounterSinkHole(M5_TAPPED_HOLE1_D / 2, M5_TAPPED_HOLE1_CSINK_D / 2, depth=M5_TAPPED_HOLE1_DEPTH, counter_sink_angle=M5_TAPPED_HOLE1_CSINK_ANGLE)
            with Locations((0, 0, -(M5_TAPPED_HOLE1_DEPTH + M5_TAPPED_HOLE1_TIP / 2))):  # 118° drill point
                Cone(0, M5_TAPPED_HOLE1_D / 2, M5_TAPPED_HOLE1_TIP, mode=Mode.SUBTRACT)


solid = part.part
